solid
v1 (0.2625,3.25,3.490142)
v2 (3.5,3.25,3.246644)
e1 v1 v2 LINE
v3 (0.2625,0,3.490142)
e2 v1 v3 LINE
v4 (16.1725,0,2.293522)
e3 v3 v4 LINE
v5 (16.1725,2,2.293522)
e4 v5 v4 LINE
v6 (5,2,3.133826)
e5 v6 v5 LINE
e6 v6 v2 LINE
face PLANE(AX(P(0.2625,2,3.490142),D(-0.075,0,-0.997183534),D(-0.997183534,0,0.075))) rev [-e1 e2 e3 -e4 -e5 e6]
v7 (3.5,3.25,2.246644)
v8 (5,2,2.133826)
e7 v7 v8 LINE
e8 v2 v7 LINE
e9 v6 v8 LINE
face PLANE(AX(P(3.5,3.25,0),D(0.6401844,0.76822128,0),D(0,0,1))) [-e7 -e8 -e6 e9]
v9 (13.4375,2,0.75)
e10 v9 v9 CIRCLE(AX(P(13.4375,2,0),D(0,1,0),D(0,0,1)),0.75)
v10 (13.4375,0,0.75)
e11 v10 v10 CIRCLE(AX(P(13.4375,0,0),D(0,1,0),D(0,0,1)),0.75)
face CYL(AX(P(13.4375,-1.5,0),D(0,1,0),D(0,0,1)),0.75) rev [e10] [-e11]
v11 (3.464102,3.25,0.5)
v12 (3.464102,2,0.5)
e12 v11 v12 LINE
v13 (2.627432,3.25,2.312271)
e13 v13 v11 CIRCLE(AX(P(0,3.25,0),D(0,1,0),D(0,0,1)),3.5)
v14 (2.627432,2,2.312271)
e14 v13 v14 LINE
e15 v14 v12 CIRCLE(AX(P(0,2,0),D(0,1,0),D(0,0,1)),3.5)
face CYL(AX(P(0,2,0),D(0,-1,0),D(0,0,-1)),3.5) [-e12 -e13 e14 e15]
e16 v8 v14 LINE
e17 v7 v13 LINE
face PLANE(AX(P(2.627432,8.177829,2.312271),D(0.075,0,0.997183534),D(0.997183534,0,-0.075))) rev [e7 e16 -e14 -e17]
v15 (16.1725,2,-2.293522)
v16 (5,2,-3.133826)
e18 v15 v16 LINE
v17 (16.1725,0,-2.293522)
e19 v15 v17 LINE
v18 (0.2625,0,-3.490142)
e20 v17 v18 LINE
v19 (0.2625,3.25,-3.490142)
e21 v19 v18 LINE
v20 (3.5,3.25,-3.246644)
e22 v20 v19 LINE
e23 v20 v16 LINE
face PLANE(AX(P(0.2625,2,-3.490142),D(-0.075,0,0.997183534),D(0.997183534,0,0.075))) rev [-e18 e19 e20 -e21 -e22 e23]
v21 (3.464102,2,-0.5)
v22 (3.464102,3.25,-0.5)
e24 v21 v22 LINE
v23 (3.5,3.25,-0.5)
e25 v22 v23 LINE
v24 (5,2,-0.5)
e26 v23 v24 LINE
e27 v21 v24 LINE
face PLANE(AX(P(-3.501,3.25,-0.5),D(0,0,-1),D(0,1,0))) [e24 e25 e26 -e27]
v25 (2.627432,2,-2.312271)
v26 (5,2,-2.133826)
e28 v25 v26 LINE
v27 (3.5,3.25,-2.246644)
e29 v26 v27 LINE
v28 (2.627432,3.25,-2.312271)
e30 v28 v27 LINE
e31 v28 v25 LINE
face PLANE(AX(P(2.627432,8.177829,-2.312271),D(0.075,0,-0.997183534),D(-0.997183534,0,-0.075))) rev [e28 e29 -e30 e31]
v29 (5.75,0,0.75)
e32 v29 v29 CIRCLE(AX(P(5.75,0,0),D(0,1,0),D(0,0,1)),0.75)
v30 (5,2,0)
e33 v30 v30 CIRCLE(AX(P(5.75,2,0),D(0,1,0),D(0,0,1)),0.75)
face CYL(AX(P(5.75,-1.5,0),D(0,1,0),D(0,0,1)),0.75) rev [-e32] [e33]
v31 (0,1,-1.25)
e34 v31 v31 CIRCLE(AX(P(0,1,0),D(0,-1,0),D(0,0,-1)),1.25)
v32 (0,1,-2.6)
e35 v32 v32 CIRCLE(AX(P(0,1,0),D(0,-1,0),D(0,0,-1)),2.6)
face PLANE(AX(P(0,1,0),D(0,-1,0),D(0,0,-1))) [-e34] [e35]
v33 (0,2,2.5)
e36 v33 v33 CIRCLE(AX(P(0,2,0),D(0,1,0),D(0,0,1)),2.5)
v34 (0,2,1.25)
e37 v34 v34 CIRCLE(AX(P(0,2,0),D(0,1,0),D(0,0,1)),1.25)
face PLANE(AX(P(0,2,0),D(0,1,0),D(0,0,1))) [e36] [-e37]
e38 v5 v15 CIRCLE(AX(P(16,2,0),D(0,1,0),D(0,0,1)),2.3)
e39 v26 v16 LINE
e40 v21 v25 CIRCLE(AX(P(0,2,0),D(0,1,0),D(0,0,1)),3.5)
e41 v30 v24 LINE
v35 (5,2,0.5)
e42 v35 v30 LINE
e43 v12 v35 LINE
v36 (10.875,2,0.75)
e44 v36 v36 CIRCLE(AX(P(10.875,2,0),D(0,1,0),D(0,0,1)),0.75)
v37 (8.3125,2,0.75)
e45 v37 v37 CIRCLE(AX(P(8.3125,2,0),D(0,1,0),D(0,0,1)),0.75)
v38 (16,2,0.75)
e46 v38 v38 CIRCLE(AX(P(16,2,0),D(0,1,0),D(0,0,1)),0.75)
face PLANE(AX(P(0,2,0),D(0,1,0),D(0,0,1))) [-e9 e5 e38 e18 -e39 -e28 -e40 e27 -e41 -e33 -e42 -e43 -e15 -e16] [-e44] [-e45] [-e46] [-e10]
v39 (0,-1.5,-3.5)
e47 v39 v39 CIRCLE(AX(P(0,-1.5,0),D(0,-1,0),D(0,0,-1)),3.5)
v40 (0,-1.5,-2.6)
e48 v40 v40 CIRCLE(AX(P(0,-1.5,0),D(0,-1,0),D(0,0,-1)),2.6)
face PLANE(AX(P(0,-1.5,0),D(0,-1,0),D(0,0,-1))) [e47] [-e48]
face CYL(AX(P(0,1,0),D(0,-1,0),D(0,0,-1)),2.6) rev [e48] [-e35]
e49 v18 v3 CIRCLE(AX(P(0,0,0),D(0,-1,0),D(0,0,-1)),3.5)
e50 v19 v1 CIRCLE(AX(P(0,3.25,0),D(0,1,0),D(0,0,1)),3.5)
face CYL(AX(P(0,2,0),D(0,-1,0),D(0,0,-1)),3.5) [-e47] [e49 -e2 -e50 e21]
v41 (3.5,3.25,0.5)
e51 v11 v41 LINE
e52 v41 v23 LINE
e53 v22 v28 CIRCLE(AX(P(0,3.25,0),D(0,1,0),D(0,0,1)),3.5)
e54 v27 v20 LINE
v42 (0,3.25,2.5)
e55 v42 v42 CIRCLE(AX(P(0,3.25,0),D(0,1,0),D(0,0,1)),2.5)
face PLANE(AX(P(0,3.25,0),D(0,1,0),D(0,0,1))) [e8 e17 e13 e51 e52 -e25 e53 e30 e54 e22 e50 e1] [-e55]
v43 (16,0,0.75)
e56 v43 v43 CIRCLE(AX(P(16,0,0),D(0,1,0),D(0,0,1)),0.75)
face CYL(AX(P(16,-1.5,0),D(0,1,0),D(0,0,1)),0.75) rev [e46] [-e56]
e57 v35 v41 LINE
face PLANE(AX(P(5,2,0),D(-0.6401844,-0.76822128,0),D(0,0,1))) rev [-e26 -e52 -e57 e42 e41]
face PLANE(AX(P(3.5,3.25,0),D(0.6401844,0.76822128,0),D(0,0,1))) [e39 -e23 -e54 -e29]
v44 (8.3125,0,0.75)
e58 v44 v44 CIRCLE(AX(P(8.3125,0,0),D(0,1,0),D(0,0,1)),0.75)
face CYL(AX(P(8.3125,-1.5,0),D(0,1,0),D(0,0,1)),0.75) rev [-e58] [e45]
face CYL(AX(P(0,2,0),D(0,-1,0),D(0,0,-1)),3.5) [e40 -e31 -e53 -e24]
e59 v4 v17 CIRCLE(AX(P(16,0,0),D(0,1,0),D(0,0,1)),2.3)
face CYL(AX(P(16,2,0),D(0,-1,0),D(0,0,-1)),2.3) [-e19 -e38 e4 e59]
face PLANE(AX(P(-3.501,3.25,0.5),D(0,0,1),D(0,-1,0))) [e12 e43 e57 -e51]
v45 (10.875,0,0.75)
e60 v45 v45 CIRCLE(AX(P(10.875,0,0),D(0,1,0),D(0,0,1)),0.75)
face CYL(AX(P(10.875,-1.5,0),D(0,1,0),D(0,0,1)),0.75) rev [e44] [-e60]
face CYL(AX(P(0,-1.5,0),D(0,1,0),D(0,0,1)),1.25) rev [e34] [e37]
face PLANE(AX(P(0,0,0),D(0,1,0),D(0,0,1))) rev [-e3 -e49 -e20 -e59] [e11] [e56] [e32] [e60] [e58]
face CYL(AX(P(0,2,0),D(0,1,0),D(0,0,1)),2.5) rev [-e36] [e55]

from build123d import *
from OCP.BRepFilletAPI import BRepFilletAPI_MakeChamfer
from build123d.topology import SkipClean

# Parameters (mm, degrees)
EXTRUDE_1_DEPTH      = 2
EXTRUDE_START        = 1.5
SKETCH_2_R           = 3.5
EXTRUDE_2_DEPTH      = 1.5
SKETCH_3_R           = 2.6
CUT_EXTRUDE_1_DEPTH  = 2.5
SKETCH_4_R           = 3.5
EXTRUDE_3_DEPTH      = 1.25
SKETCH_5_R           = 2.5
CUT_EXTRUDE_2_DEPTH  = 1.25
SKETCH_6_R           = 1.25
CUT_EXTRUDE_3_DEPTH  = 19.957584234
EXTRUDE_4_REACH      = 16.132
EXTRUDE_4_END_RADIUS = 3.5
SKETCH_8_W           = 1
SKETCH_8_H           = 1.25
EXTRUDE_5_DEPTH      = 1.25
CHAMFER_2_SIZE       = 1.25
CHAMFER_2_SIZE_2     = 1.5
SKETCH_10_R          = 0.75
CUT_EXTRUDE_4_DEPTH  = 19.957584234


with BuildPart() as part:
    # 草图1 → 凸台-拉伸1 (new body)
    with BuildSketch(Plane(origin=(0, 0, 0), x_dir=(1, 0, 0), z_dir=(0, 1, 0))):
        with BuildLine():
            Line((0.2625, 3.490142368), (16.1725, 2.293522128))
            ThreePointArc((16.1725, 2.293522128), (18.3, 0), (16.1725, -2.293522128))
            Line((16.1725, -2.293522128), (0.2625, -3.490142368))
            ThreePointArc((0.2625, -3.490142368), (-3.5, 0), (0.2625, 3.490142368))
        make_face()
    extrude(amount=EXTRUDE_1_DEPTH)

    # 草图2 → 凸台-拉伸2 (add)
    with BuildSketch(Plane.XZ.offset(EXTRUDE_START)):
        with Locations(Location((0, 0, 0), (0, 0, 270))):
            Circle(SKETCH_2_R)
    extrude(amount=-EXTRUDE_2_DEPTH)

    # 草图3 → 切除-拉伸1 (cut)
    with BuildSketch(Plane.XZ.offset(1.5)):
        with Locations(Location((0, 0, 0), (0, 0, 270))):
            Circle(SKETCH_3_R)
    extrude(amount=-CUT_EXTRUDE_1_DEPTH, mode=Mode.SUBTRACT)

    # 草图4 → 凸台-拉伸3 (add)
    with SkipClean():  # the faces are left unmerged after this step: merging them gives an invalid solid
        with BuildSketch(Plane(origin=(0, 2, 0), x_dir=(1, 0, 0), z_dir=(0, 1, 0))):
            with Locations(Location((0, 0, 0), (0, 0, 90))):
                Circle(SKETCH_4_R)
        extrude(amount=EXTRUDE_3_DEPTH)

    # 草图5 → 切除-拉伸2 (cut)
    with SkipClean():  # the faces are left unmerged after this step: merging them gives an invalid solid
        with BuildSketch(Plane(origin=(0, 3.25, 0), x_dir=(1, 0, 0), z_dir=(0, 1, 0))):
            with Locations(Location((0, 0, 0), (0, 0, 270))):
                Circle(SKETCH_5_R)
        extrude(amount=-CUT_EXTRUDE_2_DEPTH, mode=Mode.SUBTRACT)

    # 草图6 → 切除-拉伸3 (cut, through all)
    with SkipClean():  # the faces are left unmerged after this step: merging them gives an invalid solid
        with BuildSketch(Plane(origin=(0, 2, 0), x_dir=(1, 0, 0), z_dir=(0, 1, 0))):
            with Locations(Location((0, 0, 0), (0, 0, 270))):
                Circle(SKETCH_6_R)
        extrude(amount=-CUT_EXTRUDE_3_DEPTH, mode=Mode.SUBTRACT)

    # 凸台-拉伸4: up to this cylinder (the profile starts outside it)
    with SkipClean():  # the faces are left unmerged after this step: merging them gives an invalid solid
        extrude_4_end = Plane(origin=(0, 2.625, 0), z_dir=(0, -1, 0)) * Cylinder(EXTRUDE_4_END_RADIUS, 40.264, mode=Mode.PRIVATE)
        # 草图8 → 凸台-拉伸4 (add, up to the surface)
        with BuildSketch(Plane(origin=(5, 0, 0), x_dir=(0, 0, -1), z_dir=(1, 0, 0)), mode=Mode.PRIVATE) as extrude_4_sk1:
            with Locations((0, 2.625)):
                Rectangle(SKETCH_8_W, SKETCH_8_H)
        extrude_4_tool1 = extrude(extrude_4_sk1.sketch, amount=-EXTRUDE_4_REACH, mode=Mode.PRIVATE) - extrude_4_end
        add(extrude_4_tool1.solids().sort_by_distance((5, 2.625, 0))[0])

    # 草图9 → 凸台-拉伸5 (add)
    with SkipClean():  # the faces are left unmerged after this step: merging them gives an invalid solid
        with BuildSketch(Plane(origin=(0, 2, 0), x_dir=(1, 0, 0), z_dir=(0, 1, 0))):
            with BuildLine():
                Line((0.2625, 3.490142368), (5, 3.133826316))
                Line((5, 3.133826316), (5, 2.133826316))
                Line((5, 2.133826316), (2.627432324, 2.312271476))
                ThreePointArc((2.627432324, 2.312271476), (1.56037565, 3.1329264), (0.2625, 3.490142368))
            make_face()
            with BuildLine():
                Line((0.2625, -3.490142368), (5, -3.133826316))
                Line((5, -3.133826316), (5, -2.133826316))
                Line((5, -2.133826316), (2.627432324, -2.312271476))
                ThreePointArc((2.627432324, -2.312271476), (1.56037565, -3.1329264), (0.2625, -3.490142368))
            make_face()
        extrude(amount=EXTRUDE_5_DEPTH)

    # 倒角2
    chamfer_2_edges_1 = [part.edges().sort_by_distance(p)[0] for p in [
        (5, 3.25, 2.633826316),
    ]]
    chamfer_2_side_1 = [part.faces().sort_by_distance(p)[0] for p in [
        (5, 3.225, 2.633826316),
    ]]
    chamfer_2_edges_2 = [part.edges().sort_by_distance(p)[0] for p in [
        (5, 3.25, -2.633826316),
    ]]
    chamfer_2_side_2 = [part.faces().sort_by_distance(p)[0] for p in [
        (5, 3.225, -2.633826316),
    ]]
    chamfer_2_edges_3 = [part.edges().sort_by_distance(p)[0] for p in [
        (5, 3.25, 0),
    ]]
    chamfer_2_side_3 = [part.faces().sort_by_distance(p)[0] for p in [
        (5, 3.225, 0),
    ]]
    chamfer_2 = BRepFilletAPI_MakeChamfer(part.part.solid().wrapped)
    for e in chamfer_2_edges_1:
        chamfer_2.Add(CHAMFER_2_SIZE - 0.0001, CHAMFER_2_SIZE_2 - 0.0001, e.wrapped, chamfer_2_side_1[0].wrapped)
    for e in chamfer_2_edges_2:
        chamfer_2.Add(CHAMFER_2_SIZE - 0.0001, CHAMFER_2_SIZE_2 - 0.0001, e.wrapped, chamfer_2_side_2[0].wrapped)
    for e in chamfer_2_edges_3:
        chamfer_2.Add(CHAMFER_2_SIZE - 0.0001, CHAMFER_2_SIZE_2 - 0.0001, e.wrapped, chamfer_2_side_3[0].wrapped)
    add(Compound.cast(chamfer_2.Shape()), mode=Mode.REPLACE)  # a hair under: the kernel refuses the full size

    # 草图10 → 切除-拉伸4 (cut, through all)
    with BuildSketch(Plane(origin=(0, 2, 0), x_dir=(1, 0, 0), z_dir=(0, 1, 0))):
        with Locations(Location((5.75, 0, 0), (0, 0, 270))):
            Circle(SKETCH_10_R)
        with Locations(Location((8.3125, 0, 0), (0, 0, 270))):
            Circle(SKETCH_10_R)
        with Locations(Location((10.875, 0, 0), (0, 0, 270))):
            Circle(SKETCH_10_R)
        with Locations(Location((13.4375, 0, 0), (0, 0, 270))):
            Circle(SKETCH_10_R)
        with Locations(Location((16, 0, 0), (0, 0, 270))):
            Circle(SKETCH_10_R)
    extrude(amount=-CUT_EXTRUDE_4_DEPTH, mode=Mode.SUBTRACT)


solid = part.part
